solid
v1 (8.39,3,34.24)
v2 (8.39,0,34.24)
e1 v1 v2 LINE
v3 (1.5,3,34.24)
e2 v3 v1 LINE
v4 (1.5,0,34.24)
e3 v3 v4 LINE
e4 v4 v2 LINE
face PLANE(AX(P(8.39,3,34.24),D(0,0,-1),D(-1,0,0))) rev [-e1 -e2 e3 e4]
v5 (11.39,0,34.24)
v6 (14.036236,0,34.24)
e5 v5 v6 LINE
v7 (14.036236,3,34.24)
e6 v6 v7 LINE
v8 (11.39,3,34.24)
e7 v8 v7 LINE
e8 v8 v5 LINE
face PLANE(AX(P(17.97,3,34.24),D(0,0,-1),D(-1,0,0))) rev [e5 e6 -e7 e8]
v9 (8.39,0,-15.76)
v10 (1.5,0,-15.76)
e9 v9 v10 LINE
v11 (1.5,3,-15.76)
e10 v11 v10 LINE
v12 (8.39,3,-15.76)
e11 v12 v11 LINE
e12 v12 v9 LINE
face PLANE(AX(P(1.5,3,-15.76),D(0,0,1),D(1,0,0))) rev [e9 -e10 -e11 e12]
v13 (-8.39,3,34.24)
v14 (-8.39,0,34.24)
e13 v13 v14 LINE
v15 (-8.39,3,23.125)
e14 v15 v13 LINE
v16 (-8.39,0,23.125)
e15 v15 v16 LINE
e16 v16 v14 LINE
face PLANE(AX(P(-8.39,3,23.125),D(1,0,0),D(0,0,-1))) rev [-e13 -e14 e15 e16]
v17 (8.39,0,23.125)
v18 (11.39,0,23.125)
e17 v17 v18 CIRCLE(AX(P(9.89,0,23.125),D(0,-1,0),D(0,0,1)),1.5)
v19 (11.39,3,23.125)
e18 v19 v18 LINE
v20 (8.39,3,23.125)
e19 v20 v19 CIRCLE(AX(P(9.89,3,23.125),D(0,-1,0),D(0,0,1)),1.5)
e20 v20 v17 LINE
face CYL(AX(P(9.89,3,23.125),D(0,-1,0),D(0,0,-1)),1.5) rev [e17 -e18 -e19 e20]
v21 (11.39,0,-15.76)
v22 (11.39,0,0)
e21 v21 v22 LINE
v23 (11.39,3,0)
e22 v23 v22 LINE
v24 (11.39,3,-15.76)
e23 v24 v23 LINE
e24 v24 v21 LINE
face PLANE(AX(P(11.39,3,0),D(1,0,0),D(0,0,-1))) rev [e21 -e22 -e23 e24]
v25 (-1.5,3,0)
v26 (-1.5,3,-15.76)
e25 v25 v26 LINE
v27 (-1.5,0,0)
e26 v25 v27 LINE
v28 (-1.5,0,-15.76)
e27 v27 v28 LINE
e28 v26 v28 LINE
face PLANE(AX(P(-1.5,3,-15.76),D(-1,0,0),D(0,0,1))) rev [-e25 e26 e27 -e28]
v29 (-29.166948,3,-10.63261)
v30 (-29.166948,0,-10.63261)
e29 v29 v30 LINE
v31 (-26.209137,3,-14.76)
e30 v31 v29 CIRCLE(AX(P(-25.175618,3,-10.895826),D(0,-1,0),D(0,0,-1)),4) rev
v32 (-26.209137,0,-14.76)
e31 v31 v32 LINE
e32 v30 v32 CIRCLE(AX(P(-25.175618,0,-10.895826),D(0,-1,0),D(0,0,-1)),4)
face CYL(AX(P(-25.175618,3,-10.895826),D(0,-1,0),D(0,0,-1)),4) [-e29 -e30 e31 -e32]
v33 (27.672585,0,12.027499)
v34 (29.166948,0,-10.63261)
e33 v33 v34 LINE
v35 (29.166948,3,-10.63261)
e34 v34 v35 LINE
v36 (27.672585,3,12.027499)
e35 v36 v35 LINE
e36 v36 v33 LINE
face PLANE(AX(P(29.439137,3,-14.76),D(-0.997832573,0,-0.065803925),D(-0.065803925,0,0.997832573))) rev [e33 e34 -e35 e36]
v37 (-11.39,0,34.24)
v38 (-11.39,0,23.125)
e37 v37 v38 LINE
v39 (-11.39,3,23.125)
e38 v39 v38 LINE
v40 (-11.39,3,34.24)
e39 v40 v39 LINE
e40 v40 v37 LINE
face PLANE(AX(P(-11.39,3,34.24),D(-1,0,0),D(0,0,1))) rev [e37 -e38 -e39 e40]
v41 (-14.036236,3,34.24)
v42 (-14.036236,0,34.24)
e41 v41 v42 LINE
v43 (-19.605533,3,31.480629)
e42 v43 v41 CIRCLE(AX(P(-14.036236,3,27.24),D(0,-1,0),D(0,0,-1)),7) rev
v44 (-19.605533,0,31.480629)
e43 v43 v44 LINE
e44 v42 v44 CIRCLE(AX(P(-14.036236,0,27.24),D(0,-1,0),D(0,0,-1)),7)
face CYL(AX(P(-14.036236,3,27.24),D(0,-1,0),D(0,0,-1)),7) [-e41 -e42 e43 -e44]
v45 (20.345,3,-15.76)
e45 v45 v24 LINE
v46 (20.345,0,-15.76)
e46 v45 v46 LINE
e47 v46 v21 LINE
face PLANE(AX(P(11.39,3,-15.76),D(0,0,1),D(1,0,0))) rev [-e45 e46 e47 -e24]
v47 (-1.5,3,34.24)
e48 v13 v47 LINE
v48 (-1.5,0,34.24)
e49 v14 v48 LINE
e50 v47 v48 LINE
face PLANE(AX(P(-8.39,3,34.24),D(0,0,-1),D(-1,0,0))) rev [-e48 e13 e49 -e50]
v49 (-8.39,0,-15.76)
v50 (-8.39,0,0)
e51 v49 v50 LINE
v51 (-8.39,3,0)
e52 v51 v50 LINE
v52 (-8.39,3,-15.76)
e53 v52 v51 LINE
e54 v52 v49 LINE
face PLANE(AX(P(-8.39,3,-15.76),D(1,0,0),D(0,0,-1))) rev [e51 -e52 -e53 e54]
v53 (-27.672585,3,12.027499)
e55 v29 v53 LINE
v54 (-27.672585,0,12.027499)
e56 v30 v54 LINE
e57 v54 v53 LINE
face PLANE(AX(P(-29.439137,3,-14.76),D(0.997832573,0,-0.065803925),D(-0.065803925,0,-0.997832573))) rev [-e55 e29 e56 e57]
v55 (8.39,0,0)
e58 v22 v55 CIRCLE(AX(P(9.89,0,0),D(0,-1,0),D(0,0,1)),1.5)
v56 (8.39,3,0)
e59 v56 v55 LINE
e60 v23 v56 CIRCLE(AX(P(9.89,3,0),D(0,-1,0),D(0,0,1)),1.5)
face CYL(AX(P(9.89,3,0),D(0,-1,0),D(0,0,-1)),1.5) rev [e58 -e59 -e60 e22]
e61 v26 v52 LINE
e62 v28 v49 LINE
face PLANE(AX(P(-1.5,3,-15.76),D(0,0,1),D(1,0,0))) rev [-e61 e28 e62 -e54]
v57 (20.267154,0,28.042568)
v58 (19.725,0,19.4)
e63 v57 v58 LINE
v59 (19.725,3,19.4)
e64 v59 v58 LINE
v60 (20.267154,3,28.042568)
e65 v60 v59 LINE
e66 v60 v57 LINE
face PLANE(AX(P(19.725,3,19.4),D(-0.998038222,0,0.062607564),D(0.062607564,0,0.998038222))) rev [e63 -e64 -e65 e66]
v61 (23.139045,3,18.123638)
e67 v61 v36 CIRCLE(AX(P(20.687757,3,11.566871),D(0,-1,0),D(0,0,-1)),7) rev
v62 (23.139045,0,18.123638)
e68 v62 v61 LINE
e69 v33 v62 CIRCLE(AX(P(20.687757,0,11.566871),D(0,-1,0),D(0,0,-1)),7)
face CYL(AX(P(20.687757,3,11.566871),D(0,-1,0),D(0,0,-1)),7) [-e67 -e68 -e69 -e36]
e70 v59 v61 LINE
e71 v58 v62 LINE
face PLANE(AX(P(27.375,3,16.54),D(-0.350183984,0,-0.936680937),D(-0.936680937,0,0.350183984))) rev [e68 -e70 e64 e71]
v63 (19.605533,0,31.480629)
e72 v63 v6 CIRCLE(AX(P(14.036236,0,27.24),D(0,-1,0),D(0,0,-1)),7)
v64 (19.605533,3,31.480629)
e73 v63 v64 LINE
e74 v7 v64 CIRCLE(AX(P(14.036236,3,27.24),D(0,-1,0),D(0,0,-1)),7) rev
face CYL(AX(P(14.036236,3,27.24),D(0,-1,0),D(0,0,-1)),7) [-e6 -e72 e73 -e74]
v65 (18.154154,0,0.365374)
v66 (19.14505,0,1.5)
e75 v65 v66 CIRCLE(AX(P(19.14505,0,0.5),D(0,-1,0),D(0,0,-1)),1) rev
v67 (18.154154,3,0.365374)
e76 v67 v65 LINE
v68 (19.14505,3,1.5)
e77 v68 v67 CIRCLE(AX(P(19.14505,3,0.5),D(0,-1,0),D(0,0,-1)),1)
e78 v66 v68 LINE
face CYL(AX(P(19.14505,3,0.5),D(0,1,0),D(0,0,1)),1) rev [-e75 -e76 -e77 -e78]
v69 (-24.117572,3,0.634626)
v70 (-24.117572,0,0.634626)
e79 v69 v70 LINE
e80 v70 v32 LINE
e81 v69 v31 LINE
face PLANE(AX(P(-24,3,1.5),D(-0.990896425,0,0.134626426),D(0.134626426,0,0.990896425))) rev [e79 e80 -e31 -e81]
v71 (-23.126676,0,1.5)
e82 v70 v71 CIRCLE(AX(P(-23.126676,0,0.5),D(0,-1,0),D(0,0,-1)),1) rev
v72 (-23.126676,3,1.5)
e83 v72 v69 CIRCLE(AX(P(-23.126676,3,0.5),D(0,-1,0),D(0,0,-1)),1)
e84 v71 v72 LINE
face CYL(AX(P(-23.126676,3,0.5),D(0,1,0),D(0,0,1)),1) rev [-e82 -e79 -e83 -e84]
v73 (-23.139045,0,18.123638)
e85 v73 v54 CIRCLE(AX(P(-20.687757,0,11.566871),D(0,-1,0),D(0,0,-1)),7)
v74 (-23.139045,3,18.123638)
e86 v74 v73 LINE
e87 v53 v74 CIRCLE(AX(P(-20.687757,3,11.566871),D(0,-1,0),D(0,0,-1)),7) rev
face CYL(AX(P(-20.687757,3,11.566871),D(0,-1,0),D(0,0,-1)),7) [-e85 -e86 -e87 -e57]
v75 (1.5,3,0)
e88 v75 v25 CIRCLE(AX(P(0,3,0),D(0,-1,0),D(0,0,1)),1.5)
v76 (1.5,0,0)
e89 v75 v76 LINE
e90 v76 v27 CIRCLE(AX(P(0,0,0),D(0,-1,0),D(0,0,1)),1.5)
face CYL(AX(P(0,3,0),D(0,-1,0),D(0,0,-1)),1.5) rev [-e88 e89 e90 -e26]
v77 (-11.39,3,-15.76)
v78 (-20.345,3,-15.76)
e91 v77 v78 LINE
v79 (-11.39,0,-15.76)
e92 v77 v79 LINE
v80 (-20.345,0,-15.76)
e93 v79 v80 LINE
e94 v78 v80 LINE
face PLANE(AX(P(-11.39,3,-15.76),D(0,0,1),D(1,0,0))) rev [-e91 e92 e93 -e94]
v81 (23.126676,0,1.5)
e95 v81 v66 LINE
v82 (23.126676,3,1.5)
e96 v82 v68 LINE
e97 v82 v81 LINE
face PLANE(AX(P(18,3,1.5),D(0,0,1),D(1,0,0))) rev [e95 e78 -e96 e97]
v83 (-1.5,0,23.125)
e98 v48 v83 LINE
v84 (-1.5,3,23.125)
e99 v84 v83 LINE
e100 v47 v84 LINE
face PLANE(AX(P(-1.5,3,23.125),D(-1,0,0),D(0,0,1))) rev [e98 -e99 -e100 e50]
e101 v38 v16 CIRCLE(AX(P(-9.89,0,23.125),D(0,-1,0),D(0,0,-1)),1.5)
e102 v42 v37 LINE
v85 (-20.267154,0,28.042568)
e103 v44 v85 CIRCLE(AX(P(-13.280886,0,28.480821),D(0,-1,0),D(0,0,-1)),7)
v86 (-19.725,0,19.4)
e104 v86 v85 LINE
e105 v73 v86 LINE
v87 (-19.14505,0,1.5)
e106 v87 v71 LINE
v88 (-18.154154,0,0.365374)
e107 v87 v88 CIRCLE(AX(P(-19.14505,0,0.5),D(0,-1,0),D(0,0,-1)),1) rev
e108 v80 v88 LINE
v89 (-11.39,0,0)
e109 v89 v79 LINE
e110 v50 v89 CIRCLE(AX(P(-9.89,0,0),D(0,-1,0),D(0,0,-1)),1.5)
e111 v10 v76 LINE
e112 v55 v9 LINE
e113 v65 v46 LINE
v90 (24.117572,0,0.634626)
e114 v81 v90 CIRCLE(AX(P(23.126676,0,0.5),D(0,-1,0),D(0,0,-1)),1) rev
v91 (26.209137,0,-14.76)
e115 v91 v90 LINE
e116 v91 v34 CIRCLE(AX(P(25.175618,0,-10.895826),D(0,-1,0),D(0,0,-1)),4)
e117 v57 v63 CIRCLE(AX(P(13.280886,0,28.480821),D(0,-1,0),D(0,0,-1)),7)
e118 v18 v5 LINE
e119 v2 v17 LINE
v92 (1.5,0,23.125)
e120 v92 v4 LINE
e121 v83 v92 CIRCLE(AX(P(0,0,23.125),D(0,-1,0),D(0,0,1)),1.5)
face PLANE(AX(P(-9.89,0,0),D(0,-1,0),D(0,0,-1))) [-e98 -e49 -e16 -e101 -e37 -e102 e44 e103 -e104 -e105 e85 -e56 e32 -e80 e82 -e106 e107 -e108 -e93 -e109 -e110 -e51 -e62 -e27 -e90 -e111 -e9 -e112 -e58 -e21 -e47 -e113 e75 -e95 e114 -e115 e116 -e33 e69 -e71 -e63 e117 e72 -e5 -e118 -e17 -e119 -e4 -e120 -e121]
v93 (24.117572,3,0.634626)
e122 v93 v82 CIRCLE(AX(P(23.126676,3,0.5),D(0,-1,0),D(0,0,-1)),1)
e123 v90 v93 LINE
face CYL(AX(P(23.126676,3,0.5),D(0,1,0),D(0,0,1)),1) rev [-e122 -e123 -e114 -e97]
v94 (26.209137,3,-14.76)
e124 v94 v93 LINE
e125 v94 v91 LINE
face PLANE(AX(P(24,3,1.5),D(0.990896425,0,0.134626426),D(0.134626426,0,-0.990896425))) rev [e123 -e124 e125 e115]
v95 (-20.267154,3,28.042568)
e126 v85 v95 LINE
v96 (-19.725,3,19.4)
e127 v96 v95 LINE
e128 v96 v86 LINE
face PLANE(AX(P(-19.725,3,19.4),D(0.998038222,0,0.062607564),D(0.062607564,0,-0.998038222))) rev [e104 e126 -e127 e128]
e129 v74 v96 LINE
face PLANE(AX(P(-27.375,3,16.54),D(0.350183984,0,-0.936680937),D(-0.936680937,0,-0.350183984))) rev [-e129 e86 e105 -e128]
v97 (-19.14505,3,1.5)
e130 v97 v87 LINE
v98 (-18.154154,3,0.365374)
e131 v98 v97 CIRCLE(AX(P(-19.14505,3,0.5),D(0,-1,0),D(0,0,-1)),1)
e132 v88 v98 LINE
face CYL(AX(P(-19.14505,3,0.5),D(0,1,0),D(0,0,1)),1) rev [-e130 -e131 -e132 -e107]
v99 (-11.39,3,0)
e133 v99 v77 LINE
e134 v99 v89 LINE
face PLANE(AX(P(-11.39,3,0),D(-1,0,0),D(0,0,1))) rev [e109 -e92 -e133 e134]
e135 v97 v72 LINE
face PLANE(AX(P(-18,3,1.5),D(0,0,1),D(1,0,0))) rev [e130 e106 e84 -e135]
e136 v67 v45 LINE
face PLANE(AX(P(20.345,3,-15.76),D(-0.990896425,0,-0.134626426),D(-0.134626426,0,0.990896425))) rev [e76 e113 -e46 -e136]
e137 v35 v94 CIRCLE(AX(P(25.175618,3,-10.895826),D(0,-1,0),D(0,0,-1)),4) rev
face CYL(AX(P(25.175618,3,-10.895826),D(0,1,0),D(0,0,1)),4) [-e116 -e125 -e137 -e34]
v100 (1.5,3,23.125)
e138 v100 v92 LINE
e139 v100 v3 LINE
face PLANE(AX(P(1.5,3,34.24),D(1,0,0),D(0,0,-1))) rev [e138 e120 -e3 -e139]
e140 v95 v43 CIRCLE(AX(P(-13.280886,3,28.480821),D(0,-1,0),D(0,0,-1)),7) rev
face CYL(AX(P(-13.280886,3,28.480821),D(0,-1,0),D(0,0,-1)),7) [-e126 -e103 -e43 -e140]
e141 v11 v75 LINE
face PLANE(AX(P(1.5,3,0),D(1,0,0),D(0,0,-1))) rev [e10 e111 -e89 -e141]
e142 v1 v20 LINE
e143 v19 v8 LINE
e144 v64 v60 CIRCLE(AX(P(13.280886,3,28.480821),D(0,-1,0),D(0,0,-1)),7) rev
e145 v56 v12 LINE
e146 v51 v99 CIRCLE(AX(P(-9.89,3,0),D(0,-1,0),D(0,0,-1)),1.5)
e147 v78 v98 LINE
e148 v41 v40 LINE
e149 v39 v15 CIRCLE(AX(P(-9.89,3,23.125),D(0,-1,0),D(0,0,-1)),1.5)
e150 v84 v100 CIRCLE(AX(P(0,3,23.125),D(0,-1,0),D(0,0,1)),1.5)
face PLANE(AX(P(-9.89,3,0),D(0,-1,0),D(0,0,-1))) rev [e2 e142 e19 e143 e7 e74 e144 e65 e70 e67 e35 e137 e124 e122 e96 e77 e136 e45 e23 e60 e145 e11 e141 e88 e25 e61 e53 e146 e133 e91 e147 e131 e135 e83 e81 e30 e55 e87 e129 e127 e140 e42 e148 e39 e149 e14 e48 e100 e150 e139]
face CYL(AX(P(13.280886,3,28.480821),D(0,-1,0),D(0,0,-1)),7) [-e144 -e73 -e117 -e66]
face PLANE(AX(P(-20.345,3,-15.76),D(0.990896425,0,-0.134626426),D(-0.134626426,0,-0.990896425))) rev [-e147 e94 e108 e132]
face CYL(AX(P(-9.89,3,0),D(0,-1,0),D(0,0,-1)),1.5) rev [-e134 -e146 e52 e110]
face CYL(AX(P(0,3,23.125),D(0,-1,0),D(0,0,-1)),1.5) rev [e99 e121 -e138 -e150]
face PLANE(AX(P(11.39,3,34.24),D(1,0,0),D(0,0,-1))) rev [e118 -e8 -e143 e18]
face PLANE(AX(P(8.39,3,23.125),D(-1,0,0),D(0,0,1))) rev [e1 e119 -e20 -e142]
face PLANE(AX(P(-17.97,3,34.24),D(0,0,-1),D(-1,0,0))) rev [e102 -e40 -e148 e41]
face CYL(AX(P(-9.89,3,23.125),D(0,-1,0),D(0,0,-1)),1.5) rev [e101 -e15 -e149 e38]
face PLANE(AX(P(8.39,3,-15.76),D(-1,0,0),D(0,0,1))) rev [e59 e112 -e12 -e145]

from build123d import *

# Parameters (mm, degrees)
BOSS_EXTRUDE1_DEPTH = 3
FILLET1_R           = 4
FILLET2_R           = 1
FILLET3_R           = 7


with BuildPart() as part:
    # Sketch1 → Boss-Extrude1 (new body)
    with BuildSketch(Plane(origin=(0, 0, 0), x_dir=(1, 0, 0), z_dir=(0, 1, 0))):
        with BuildLine():
            Line((-1.5, 15.76), (-1.5, 0))
            ThreePointArc((-1.5, 0), (0, -1.5), (1.5, 0))
            Line((1.5, 0), (1.5, 15.76))
            Line((1.5, 15.76), (8.39, 15.76))
            Line((8.39, 15.76), (8.39, 0))
            ThreePointArc((8.39, 0), (9.89, -1.5), (11.39, 0))
            Line((11.39, 0), (11.39, 15.76))
            Line((11.39, 15.76), (20.345, 15.76))
            Line((20.345, 15.76), (18, -1.5))
            Line((18, -1.5), (24, -1.5))
            Line((24, -1.5), (26.209136732, 14.76))
            Line((26.209136732, 14.76), (29.439136732, 14.76))
            Line((29.439136732, 14.76), (27.375, -16.54))
            Line((27.375, -16.54), (19.725, -19.4))
            Line((19.725, -19.4), (20.405, -30.24))
            Line((20.405, -30.24), (17.97, -34.24))
            Line((17.97, -34.24), (11.39, -34.24))
            Line((11.39, -34.24), (11.39, -23.125))
            ThreePointArc((11.39, -23.125), (9.89, -21.625), (8.39, -23.125))
            Line((8.39, -23.125), (8.39, -34.24))
            Line((8.39, -34.24), (1.5, -34.24))
            Line((1.5, -34.24), (1.5, -23.125))
            ThreePointArc((1.5, -23.125), (0, -21.625), (-1.5, -23.125))
            Line((-1.5, -23.125), (-1.5, -34.24))
            Line((-1.5, -34.24), (-8.39, -34.24))
            Line((-8.39, -34.24), (-8.39, -23.125))
            ThreePointArc((-8.39, -23.125), (-9.89, -21.625), (-11.39, -23.125))
            Line((-11.39, -23.125), (-11.39, -34.24))
            Line((-11.39, -34.24), (-17.97, -34.24))
            Line((-17.97, -34.24), (-20.405, -30.24))
            Line((-20.405, -30.24), (-19.725, -19.4))
            Line((-19.725, -19.4), (-27.375, -16.54))
            Line((-27.375, -16.54), (-29.439136732, 14.76))
            Line((-29.439136732, 14.76), (-26.209136732, 14.76))
            Line((-26.209136732, 14.76), (-24, -1.5))
            Line((-24, -1.5), (-18, -1.5))
            Line((-18, -1.5), (-20.345, 15.76))
            Line((-20.345, 15.76), (-11.39, 15.76))
            Line((-11.39, 15.76), (-11.39, 0))
            ThreePointArc((-11.39, 0), (-9.89, -1.5), (-8.39, 0))
            Line((-8.39, 0), (-8.39, 15.76))
            Line((-8.39, 15.76), (-1.5, 15.76))
        make_face()
    extrude(amount=BOSS_EXTRUDE1_DEPTH)

    # Fillet1
    # the kernel refuses this fillet: 4 mm, written as the material it takes off along each edge
    with BuildSketch(Plane(origin=(-29.439136732, -10.340886874, -14.76), x_dir=(0.0658039254405357, 0, 0.9978325728280353), z_dir=(0, 1, 0))) as fillet1_piece_1:
        with BuildLine():
            CenterArc((4.136354749, 4), FILLET1_R, 191.20092555, 78.79907445)
            Line((0.212546679, 3.22299921), (0.134070518, 3.207459194))
            ThreePointArc((0.134070518, 3.207459194), (0.026446734, 1.616763919), (-0.079826606, 0.005264314))
            Line((-0.079826606, 0.005264314), (0, -0.08))
            Line((0, -0.08), (4.136354749, -0.08))
            Line((4.136354749, -0.08), (4.136354749, 0))
        make_face()
    extrude(amount=23.681773747, mode=Mode.SUBTRACT)
    with BuildSketch(Plane(origin=(29.439136732, -10.340886874, -14.76), x_dir=(-1, 0, 0), z_dir=(0, 1, 0))) as fillet1_piece_2:
        with BuildLine():
            CenterArc((4.263518671, 3.8641738), FILLET1_R, 176.226986492, 78.79907445)
            Line((0.27218838, 4.127389502), (0.192361774, 4.132653816))
            Line((0.192361774, 4.132653816), (-0.079826606, 0.005264314))
            Line((-0.079826606, 0.005264314), (0, -0.08))
            ThreePointArc((0, -0.08), (1.615, -0.08), (3.209329627, -0.077283476))
            Line((3.209329627, -0.077283476), (3.23, 0))
        make_face()
    extrude(amount=23.681773747, mode=Mode.SUBTRACT)

    # Fillet2
    fillet2_edges = [part.edges().sort_by_distance(p)[0] for p in [
        (18, 1.5, 1.5),
        (24, 1.5, 1.5),
        (-24, 1.5, 1.5),
        (-18, 1.5, 1.5),
    ]]
    fillet(fillet2_edges, radius=FILLET2_R)

    # Fillet3
    # the kernel refuses this fillet: 7 mm, written as the material it takes off along each edge
    with BuildSketch(Plane(origin=(-17.97, -9.834409558, 34.24), x_dir=(-0.5199808190603049, 0, -0.8541779368547132), z_dir=(0, 1, 0)), Plane(origin=(17.97, -9.834409558, 34.24), x_dir=(-1, 0, 0), z_dir=(0, 1, 0))) as fillet3_piece_1:
        with BuildLine():
            CenterArc((FILLET3_R * 0.561966260458, -FILLET3_R), FILLET3_R, 90, 58.669035113)
            Line((-FILLET3_R * 0.292211676397, -FILLET3_R * 0.48001918094), (0, 0))
            Line((0, 0), (FILLET3_R * 0.561966260458, 0))
        make_face()
    extrude(amount=22.668819116, mode=Mode.SUBTRACT)
    with BuildSketch(Plane(origin=(-20.405, -5.504377364, 30.24), x_dir=(0.06260756375388789, 0, -0.998038222194322), z_dir=(0, 1, 0)), Plane(origin=(20.405, -5.504377364, 30.24), x_dir=(-0.5199808190603047, 0, 0.8541779368547133), z_dir=(0, 1, 0))) as fillet3_piece_2:
        with BuildLine():
            CenterArc((FILLET3_R * 0.314535849376, -FILLET3_R), FILLET3_R, 90, 34.920461628)
            Line((-FILLET3_R * 0.257902882493, -FILLET3_R * 0.180052502744), (0, 0))
            Line((0, 0), (FILLET3_R * 0.314535849376, 0))
        make_face()
    extrude(amount=14.008754728, mode=Mode.SUBTRACT)
    with BuildSketch(Plane(origin=(-27.375, -11.305757053, 16.54), x_dir=(-0.06580392544053615, 0, -0.9978325728280353), z_dir=(0, 1, 0)), Plane(origin=(27.375, -11.305757053, 16.54), x_dir=(-0.9366809367224829, 0, 0.3501839841864447), z_dir=(0, 1, 0))) as fillet3_piece_3:
        with BuildLine():
            CenterArc((FILLET3_R * 0.646043260189, -FILLET3_R), FILLET3_R, 90, 65.728417673)
            Line((-FILLET3_R * 0.265564008034, -FILLET3_R * 0.588937731574), (0, 0))
            Line((0, 0), (FILLET3_R * 0.646043260189, 0))
        make_face()
    extrude(amount=25.611514107, mode=Mode.SUBTRACT)


solid = part.part
